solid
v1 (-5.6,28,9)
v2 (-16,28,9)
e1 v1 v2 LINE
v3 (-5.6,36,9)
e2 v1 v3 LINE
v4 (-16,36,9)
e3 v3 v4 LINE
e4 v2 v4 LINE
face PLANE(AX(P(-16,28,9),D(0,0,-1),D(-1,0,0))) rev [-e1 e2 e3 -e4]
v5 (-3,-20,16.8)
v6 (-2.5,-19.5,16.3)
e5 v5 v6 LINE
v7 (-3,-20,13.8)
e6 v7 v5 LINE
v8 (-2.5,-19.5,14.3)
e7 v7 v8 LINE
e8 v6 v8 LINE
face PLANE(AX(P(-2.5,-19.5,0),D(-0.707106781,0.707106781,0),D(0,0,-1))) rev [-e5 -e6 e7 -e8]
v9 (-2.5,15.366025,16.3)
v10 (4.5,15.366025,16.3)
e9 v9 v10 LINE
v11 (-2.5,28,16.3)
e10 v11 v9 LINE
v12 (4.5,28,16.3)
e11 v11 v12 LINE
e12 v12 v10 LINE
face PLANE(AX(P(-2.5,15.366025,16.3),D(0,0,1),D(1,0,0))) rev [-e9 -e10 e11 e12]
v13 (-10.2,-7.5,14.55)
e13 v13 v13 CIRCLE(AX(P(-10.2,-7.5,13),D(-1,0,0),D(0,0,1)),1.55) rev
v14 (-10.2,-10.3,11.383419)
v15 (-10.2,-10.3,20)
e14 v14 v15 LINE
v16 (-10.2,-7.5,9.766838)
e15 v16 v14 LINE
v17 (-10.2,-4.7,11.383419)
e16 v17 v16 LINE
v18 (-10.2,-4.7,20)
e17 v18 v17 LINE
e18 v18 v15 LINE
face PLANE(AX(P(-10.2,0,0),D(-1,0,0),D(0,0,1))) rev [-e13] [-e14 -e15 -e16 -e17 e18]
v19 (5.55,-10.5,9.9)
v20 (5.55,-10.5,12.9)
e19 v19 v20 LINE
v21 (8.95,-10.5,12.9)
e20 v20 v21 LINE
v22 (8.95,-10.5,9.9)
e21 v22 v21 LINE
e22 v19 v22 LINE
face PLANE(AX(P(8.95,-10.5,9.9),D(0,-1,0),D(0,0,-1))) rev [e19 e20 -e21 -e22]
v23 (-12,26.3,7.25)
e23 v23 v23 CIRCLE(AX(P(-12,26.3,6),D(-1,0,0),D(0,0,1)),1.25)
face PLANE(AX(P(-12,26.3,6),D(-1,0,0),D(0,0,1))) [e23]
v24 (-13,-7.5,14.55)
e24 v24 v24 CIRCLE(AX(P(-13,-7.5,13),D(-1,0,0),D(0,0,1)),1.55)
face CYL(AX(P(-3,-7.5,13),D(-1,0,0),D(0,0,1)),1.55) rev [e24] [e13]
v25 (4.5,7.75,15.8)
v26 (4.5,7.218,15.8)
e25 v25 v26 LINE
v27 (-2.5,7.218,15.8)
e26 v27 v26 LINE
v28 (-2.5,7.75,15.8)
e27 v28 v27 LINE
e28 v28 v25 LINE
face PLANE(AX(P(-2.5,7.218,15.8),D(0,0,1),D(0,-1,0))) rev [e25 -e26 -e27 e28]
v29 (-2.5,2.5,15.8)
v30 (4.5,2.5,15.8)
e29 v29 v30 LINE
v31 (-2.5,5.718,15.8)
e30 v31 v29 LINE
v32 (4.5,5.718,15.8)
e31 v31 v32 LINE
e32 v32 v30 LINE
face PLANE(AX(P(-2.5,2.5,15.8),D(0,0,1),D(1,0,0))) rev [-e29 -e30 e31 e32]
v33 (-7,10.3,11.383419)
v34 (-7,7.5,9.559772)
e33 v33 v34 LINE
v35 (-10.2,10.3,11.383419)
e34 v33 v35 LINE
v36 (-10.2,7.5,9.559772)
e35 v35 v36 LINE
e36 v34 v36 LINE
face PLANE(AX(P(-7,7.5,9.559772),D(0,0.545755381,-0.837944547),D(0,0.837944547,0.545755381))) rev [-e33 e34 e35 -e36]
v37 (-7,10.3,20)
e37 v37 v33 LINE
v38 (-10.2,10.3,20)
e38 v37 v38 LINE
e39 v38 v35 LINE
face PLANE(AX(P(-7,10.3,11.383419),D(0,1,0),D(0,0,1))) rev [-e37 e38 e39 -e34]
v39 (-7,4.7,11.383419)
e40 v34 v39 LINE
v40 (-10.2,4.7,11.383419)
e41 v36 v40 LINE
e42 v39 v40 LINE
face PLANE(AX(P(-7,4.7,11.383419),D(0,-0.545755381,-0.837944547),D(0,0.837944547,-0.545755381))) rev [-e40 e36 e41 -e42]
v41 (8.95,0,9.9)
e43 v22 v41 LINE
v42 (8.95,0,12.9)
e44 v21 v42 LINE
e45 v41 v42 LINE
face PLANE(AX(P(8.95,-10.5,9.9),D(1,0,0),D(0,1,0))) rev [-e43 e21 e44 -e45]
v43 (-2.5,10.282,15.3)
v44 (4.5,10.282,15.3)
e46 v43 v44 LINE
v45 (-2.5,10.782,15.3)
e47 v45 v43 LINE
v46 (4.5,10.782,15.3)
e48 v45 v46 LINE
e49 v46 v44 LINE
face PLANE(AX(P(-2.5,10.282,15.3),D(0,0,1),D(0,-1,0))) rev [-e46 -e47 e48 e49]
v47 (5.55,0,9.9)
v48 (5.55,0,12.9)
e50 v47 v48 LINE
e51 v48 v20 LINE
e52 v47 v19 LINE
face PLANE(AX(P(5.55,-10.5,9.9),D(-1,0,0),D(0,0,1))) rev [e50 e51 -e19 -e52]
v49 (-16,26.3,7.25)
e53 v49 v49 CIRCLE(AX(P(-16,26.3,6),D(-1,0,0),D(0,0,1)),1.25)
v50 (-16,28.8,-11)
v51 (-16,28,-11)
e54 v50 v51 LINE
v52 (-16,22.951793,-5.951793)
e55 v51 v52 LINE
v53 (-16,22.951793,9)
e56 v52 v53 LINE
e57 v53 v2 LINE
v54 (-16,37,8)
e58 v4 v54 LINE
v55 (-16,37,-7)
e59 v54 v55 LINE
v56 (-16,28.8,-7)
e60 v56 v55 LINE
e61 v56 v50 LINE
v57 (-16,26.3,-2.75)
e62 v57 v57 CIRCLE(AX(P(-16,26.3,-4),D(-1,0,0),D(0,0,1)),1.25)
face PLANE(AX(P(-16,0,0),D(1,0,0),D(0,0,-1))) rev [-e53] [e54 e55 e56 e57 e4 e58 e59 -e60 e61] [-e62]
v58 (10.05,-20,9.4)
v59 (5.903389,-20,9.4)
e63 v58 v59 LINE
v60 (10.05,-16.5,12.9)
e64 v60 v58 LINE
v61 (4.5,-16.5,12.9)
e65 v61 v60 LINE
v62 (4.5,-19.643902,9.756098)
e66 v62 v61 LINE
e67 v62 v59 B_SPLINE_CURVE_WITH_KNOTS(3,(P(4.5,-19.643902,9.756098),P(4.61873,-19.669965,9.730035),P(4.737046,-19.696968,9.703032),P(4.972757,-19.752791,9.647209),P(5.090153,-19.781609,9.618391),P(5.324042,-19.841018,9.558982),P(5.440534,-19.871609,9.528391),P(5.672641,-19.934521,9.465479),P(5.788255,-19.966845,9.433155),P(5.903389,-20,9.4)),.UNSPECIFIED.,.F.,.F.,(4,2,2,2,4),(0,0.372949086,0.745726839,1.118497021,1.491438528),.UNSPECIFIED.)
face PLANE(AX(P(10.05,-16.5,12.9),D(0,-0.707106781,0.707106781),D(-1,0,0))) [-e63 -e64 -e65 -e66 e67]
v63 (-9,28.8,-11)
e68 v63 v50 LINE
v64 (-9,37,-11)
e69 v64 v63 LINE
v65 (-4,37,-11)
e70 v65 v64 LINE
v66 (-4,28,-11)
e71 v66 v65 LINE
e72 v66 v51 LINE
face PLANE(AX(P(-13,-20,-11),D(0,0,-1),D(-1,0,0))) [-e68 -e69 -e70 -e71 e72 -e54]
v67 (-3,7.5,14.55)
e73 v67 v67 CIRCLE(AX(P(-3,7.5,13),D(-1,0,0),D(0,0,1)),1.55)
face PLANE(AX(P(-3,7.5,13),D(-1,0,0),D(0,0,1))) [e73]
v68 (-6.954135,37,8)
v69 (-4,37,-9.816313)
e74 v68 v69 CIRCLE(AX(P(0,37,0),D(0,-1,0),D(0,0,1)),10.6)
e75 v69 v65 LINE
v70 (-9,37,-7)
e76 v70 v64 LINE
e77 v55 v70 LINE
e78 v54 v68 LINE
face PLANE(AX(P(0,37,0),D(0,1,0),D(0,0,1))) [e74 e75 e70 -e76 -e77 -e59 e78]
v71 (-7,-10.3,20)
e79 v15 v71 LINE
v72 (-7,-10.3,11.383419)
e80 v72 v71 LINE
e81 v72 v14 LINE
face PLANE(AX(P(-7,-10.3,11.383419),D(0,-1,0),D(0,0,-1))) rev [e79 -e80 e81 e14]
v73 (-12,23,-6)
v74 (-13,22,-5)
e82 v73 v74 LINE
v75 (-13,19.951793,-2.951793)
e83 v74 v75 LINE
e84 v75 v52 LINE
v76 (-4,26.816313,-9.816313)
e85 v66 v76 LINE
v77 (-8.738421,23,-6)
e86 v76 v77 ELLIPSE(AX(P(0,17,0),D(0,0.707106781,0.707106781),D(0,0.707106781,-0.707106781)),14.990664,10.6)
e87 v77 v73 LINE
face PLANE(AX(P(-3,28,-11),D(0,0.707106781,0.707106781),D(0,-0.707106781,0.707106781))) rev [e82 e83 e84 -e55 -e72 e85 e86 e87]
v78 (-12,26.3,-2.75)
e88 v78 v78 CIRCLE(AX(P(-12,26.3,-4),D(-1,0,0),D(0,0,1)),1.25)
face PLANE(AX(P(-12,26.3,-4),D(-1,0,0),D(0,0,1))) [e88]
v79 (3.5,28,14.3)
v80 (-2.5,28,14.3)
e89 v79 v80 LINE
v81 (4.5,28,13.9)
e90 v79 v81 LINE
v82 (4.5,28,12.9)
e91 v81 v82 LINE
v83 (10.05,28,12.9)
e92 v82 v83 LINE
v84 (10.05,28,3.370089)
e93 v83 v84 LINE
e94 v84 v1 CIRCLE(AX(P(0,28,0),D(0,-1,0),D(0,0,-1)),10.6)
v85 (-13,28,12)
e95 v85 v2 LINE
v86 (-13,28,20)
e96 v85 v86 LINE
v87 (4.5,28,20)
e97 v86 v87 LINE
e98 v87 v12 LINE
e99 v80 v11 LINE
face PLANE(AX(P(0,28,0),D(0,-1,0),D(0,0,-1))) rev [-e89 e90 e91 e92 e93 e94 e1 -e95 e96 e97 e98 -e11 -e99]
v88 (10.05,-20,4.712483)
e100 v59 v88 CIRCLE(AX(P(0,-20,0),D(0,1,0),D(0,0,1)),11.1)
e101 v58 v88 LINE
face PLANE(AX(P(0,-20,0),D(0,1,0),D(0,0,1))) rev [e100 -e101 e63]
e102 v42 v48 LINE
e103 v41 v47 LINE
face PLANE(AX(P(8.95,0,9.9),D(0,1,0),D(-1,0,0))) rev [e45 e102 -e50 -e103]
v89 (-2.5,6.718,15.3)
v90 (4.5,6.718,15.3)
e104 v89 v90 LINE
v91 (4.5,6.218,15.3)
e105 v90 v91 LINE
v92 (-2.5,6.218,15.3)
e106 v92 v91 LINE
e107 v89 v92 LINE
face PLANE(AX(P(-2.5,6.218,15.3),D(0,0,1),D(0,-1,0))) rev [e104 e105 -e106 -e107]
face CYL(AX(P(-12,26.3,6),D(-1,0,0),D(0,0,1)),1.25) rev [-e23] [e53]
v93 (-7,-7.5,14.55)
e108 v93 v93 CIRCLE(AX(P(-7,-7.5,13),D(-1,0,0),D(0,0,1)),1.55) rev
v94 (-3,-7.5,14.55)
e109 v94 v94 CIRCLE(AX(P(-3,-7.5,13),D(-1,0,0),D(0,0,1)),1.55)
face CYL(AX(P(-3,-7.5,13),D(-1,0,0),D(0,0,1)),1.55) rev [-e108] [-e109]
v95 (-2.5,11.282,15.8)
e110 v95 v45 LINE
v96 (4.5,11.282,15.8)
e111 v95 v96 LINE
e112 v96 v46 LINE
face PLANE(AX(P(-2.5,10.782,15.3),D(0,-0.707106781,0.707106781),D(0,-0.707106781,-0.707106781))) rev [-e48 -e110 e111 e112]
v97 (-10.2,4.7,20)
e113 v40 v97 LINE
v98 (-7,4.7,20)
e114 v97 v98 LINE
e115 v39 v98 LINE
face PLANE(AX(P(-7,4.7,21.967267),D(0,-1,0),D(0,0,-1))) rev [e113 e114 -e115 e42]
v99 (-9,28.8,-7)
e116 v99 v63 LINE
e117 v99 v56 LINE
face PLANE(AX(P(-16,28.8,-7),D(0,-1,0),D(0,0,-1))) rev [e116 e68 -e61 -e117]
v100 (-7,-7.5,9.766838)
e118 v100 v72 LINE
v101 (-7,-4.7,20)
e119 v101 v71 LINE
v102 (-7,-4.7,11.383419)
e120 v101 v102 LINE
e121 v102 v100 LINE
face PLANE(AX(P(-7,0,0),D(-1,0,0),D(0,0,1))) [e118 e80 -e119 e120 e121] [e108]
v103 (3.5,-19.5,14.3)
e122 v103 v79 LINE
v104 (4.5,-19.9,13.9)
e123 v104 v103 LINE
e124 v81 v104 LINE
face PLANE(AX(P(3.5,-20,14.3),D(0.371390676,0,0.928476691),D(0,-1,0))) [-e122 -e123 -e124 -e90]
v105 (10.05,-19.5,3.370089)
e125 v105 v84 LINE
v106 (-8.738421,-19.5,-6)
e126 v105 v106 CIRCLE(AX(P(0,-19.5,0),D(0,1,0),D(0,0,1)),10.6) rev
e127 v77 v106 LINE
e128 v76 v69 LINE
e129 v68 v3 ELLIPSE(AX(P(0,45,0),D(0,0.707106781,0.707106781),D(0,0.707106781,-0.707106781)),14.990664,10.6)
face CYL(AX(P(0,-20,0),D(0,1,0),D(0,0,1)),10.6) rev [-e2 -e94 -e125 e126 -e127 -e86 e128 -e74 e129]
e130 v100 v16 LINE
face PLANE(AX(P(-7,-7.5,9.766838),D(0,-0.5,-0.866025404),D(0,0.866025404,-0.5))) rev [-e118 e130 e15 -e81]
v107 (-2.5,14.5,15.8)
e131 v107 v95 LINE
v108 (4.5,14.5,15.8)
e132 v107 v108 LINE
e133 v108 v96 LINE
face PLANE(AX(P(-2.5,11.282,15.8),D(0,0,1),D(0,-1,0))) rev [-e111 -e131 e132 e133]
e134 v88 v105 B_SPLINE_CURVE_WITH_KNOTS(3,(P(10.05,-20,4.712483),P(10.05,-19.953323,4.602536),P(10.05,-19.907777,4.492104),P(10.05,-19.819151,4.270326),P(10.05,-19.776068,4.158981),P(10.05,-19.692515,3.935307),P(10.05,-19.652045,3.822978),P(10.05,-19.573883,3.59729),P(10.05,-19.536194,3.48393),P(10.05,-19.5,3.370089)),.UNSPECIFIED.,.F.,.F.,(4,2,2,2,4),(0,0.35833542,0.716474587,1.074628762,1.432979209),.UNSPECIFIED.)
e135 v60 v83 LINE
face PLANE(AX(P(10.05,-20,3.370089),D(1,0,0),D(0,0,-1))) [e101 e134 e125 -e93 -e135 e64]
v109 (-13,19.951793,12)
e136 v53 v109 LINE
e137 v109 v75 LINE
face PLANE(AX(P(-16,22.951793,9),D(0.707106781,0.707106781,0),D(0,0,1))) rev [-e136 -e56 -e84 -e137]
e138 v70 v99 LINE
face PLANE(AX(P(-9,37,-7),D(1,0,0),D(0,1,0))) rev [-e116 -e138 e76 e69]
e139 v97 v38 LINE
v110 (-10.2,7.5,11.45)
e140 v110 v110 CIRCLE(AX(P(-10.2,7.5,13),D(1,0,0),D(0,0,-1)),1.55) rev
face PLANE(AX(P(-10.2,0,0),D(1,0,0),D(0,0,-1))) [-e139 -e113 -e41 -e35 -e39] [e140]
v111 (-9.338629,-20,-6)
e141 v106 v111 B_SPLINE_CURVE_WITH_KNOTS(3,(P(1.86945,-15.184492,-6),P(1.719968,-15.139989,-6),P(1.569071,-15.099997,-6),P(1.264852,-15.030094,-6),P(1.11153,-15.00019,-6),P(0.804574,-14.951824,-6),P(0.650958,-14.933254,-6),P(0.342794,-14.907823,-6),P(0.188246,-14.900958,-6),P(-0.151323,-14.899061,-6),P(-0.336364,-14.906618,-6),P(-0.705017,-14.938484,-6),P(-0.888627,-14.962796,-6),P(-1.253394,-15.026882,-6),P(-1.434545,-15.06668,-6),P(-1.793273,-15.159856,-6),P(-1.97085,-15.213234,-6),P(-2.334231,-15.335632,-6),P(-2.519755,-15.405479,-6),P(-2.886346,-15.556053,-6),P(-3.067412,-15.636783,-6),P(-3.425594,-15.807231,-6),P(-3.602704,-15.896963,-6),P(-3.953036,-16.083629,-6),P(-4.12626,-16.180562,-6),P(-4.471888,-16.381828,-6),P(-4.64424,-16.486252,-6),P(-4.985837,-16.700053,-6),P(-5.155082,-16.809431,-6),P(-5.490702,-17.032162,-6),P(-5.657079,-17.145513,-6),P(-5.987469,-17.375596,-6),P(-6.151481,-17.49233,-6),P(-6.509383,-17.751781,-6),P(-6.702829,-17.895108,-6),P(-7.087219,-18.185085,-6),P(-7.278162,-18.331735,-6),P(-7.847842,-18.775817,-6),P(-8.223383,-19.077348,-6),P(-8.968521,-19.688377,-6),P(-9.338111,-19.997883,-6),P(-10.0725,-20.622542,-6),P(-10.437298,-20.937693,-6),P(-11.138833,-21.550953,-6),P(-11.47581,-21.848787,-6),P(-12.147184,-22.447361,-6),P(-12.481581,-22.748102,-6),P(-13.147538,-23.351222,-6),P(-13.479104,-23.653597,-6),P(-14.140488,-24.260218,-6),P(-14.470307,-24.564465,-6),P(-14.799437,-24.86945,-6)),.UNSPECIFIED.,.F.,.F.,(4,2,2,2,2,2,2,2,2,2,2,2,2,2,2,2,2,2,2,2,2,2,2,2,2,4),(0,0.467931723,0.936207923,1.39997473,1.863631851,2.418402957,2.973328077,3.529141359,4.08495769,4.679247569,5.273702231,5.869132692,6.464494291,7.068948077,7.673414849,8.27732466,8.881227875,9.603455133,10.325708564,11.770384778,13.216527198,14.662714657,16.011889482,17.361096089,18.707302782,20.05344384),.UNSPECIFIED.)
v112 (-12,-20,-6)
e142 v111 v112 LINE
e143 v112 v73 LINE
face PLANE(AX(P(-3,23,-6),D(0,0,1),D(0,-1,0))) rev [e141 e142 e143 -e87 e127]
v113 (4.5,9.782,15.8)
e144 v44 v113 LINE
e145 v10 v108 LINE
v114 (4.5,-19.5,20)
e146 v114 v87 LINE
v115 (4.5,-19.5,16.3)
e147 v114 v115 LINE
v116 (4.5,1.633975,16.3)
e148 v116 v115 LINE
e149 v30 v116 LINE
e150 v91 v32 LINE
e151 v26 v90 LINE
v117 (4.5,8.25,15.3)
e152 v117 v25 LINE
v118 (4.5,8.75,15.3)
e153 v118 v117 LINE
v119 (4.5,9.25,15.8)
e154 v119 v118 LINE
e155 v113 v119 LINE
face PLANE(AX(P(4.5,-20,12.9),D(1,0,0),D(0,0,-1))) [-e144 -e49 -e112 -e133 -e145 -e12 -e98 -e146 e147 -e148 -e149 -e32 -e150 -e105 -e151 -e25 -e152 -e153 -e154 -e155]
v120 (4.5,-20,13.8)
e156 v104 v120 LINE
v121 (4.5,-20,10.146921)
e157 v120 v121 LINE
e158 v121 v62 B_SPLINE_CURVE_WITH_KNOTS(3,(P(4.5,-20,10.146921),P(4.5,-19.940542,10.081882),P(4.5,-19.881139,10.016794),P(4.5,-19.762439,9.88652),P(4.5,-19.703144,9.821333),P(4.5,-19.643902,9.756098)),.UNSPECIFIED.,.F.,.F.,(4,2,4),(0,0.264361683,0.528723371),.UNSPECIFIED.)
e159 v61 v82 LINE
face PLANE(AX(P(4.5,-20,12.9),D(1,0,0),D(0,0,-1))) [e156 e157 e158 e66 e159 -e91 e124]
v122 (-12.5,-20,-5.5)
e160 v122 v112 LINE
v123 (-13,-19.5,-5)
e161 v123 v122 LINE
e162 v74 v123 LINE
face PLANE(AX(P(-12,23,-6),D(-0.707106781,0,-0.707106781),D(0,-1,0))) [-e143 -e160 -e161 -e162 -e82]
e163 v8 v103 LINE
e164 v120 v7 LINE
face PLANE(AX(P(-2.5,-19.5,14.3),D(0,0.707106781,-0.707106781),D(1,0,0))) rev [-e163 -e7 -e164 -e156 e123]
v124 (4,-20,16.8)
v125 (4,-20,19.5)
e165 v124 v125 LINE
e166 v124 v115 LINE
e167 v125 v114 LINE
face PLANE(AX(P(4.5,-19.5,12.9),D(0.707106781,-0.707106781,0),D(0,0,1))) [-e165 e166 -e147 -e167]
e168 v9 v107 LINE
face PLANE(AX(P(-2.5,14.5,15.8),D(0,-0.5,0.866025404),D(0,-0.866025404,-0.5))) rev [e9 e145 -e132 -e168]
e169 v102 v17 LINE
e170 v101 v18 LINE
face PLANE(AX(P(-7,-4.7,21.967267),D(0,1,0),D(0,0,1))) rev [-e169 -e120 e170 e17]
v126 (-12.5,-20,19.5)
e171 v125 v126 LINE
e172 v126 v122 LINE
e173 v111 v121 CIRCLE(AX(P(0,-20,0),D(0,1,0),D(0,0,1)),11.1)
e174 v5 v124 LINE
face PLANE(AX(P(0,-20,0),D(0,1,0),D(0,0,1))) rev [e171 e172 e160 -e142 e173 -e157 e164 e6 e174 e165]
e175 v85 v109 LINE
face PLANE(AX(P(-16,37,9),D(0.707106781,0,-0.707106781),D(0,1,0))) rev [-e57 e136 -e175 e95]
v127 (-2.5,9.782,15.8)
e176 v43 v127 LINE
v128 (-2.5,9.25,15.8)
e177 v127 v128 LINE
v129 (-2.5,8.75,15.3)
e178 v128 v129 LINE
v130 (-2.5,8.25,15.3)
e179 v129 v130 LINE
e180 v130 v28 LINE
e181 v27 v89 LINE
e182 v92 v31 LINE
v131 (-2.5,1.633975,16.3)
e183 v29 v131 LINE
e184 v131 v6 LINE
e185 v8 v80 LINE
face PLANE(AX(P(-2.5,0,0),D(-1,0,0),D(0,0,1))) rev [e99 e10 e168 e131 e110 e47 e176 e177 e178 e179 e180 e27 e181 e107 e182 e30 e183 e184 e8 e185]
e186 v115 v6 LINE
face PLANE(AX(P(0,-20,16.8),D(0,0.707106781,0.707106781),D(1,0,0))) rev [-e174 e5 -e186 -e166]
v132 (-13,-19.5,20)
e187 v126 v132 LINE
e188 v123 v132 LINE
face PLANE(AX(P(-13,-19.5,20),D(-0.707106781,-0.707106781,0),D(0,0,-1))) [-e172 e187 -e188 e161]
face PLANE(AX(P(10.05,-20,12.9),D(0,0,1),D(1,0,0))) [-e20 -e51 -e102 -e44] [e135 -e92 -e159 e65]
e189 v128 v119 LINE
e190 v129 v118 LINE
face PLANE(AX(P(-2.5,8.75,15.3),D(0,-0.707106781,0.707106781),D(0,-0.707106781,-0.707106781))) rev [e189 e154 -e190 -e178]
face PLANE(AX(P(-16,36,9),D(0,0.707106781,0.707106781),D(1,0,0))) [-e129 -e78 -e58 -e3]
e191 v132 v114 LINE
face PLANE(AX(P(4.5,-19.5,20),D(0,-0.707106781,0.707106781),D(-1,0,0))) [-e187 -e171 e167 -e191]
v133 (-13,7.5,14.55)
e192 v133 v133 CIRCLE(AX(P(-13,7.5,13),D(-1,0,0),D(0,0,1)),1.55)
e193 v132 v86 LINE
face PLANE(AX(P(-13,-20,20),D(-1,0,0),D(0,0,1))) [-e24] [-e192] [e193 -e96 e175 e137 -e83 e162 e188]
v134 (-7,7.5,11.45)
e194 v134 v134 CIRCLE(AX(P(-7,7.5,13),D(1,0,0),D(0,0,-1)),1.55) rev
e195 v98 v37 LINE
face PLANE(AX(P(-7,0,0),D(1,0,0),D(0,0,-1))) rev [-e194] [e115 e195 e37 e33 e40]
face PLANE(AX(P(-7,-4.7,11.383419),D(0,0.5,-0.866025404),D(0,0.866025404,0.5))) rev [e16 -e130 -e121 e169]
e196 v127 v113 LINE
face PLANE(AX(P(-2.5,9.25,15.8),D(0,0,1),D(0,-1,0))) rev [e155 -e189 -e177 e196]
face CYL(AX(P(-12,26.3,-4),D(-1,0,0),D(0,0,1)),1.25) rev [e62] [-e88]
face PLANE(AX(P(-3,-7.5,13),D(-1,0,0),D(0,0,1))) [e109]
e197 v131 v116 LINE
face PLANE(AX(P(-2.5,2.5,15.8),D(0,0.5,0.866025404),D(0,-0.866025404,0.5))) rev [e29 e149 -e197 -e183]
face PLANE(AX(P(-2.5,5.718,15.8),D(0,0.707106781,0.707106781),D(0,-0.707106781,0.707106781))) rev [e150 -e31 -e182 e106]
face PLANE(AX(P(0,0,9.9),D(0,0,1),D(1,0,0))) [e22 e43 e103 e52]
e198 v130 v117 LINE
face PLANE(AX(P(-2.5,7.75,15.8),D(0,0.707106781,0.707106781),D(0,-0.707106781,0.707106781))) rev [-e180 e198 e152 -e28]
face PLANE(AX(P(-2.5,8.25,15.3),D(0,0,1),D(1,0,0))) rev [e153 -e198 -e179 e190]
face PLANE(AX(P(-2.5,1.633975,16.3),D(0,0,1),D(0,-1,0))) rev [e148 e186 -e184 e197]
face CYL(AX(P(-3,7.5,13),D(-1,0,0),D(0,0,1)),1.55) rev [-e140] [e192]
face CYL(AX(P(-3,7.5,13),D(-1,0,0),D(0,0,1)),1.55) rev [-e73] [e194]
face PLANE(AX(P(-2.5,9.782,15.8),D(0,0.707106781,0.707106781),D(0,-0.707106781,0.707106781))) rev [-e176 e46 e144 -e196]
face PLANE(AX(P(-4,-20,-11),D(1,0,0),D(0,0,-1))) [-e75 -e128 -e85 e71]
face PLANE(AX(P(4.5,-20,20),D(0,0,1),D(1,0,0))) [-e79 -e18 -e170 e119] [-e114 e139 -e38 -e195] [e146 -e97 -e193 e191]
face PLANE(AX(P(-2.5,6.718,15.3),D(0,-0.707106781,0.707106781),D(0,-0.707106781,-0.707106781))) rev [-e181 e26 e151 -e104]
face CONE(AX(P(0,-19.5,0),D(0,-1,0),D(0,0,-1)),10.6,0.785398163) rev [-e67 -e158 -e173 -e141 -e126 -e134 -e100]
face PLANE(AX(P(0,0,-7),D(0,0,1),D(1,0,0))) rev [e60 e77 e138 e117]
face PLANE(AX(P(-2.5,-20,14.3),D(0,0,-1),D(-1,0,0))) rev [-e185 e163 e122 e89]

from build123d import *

# Parameters (mm, degrees)
BOSS_EXTRUDE1_DEPTH      = 37
BOSS_EXTRUDE1_DEPTH_BACK = 20
CUT_EXTRUDE5_DEPTH       = 7
CHAMFER2_SIZE            = 3.5
CHAMFER3_SIZE            = 0.5
SKETCH6_R                = 1.55
CUT_EXTRUDE6_DEPTH       = 10
CUT_EXTRUDE7_START       = -2.8
CUT_EXTRUDE7_DEPTH       = 3.2
CUT_EXTRUDE9_DEPTH       = 10
BOSS_EXTRUDE2_DEPTH      = 3
SKETCH10_W               = 7
SKETCH10_H               = 8.2
CUT_EXTRUDE10_DEPTH      = 4
SKETCH11_R               = 1.25
CUT_EXTRUDE11_DEPTH      = 4
CHAMFER4_SIZE            = 3
CUT_EXTRUDE12_DEPTH      = 9
CHAMFER5_SIZE            = 1
SKETCH14_W               = 3.4
SKETCH14_H               = 10.5
CUT_EXTRUDE13_DEPTH      = 3
CHAMFER6_SIZE            = 1
CHAMFER7_SIZE            = 0.4
CHAMFER7_SIZE2           = 1


# Some blends are built 0.0001 mm under size
with BuildPart() as part:
    # Sketch2 → Boss-Extrude1 (new, two sides: drawn at the far end of the back side and taken through both)
    with BuildSketch(Plane(origin=(0, 0, 0), x_dir=(1, 0, 0), z_dir=(0, 1, 0)).offset(-BOSS_EXTRUDE1_DEPTH_BACK)):
        with BuildLine():
            Line((10.05, -12.9), (4.5, -12.9))
            Line((4.5, -12.9), (4.5, -20))
            Line((4.5, -20), (-13, -20))
            Line((-13, -20), (-13, 11))
            Line((-13, 11), (-4, 11))
            Line((-4, 11), (-4, 9.816312953))
            ThreePointArc((-4, 9.816312953), (-7.25402814, -7.729105754), (10.05, -3.37008902))
            Line((10.05, -3.37008902), (10.05, -12.9))
        make_face()
    extrude(amount=BOSS_EXTRUDE1_DEPTH + BOSS_EXTRUDE1_DEPTH_BACK)

    # Sketch5 → Cut-Extrude5 (cut)
    with BuildSketch(Plane(origin=(4.5, 0, 0), x_dir=(0, 0, -1), z_dir=(1, 0, 0))):
        Polygon((-15.8, 5.718), (-15.3, 6.218), (-15.3, 6.718), (-15.8, 7.218), (-15.8, 7.75), (-15.3, 8.25), (-15.3, 8.75), (-15.8, 9.25), (-15.8, 9.782), (-15.3, 10.282), (-15.3, 10.782), (-15.8, 11.282), (-15.8, 14.5), (-16.3, 15.366025404), (-16.3, 37), (-14.3, 37), (-14.3, -20), (-16.3, -20), (-16.3, 1.633974596), (-15.8, 2.5), align=None)
    extrude(amount=-CUT_EXTRUDE5_DEPTH, mode=Mode.SUBTRACT)

    # Chamfer2
    # the kernel refuses this chamfer: 3.5 mm, written as the material it takes off along each edge
    with BuildSketch(Plane(origin=(19.050890458, -20, 12.9), x_dir=(0, 0.9996219169112968, 0.02749587661058662), z_dir=(-1, 0, 0))) as chamfer2_piece_1:
        Polygon((CHAMFER2_SIZE * 0.999621916911, CHAMFER2_SIZE * 0.0274958766106), (-CHAMFER2_SIZE * 0.0274958766106, CHAMFER2_SIZE * 0.999621916911), (0, 0), align=None)
    extrude(amount=14.550890458, mode=Mode.SUBTRACT)

    # Chamfer3
    # the kernel refuses this chamfer: 0.5 mm, written as the material it takes off along each edge
    with BuildSketch(Plane(origin=(-4, -20, -12.285841494), x_dir=(-0.9996219169112968, -0.0274958766105891, 0), z_dir=(0, 0, 1))) as chamfer3_piece_1:
        Polygon((CHAMFER3_SIZE * 0.999621916911, -CHAMFER3_SIZE * 0.0274958766106), (-CHAMFER3_SIZE * 0.0274958766106, -CHAMFER3_SIZE * 0.999621916911), (0, 0), align=None)
    extrude(amount=3.755370035, mode=Mode.SUBTRACT)
    with BuildSketch(Plane(origin=(0, -20, 0), x_dir=(-0.26232896064226713, 0, -0.9649785056716795), z_dir=(0.9649785056716795, 0, -0.26232896064226713))) as chamfer3_piece_2:
        Polygon((10.6 + CHAMFER3_SIZE, 0), (10.6, CHAMFER3_SIZE), (10.6, 0), align=None)
    revolve(axis=Axis((0, -20, 0), (0, 1, 0)), revolution_arc=196.87436844, mode=Mode.SUBTRACT)
    with BuildSketch(Plane(origin=(5.785841494, -20, 14.3), x_dir=(0, -0.0274958766105891, -0.9996219169112968), z_dir=(-1, 0, 0))) as chamfer3_piece_3:
        Polygon((CHAMFER3_SIZE * 0.999621916911, -CHAMFER3_SIZE * 0.0274958766106), (-CHAMFER3_SIZE * 0.0274958766106, -CHAMFER3_SIZE * 0.999621916911), (0, 0), align=None)
    extrude(amount=8.285841494, mode=Mode.SUBTRACT)
    with BuildSketch(Plane(origin=(-2.5, -20, 14.3), x_dir=(-0.9996219169112968, -0.027495876610589075, 0), z_dir=(0, 0, 1))) as chamfer3_piece_4:
        Polygon((CHAMFER3_SIZE * 0.999621916911, -CHAMFER3_SIZE * 0.0274958766106), (-CHAMFER3_SIZE * 0.0274958766106, -CHAMFER3_SIZE * 0.999621916911), (0, 0), align=None)
    extrude(amount=2, mode=Mode.SUBTRACT)
    with BuildSketch(Plane(origin=(5.785841494, -20, 16.3), x_dir=(0, -0.027495876610589005, 0.9996219169112968), z_dir=(-1, 0, 0))) as chamfer3_piece_5:
        Polygon((CHAMFER3_SIZE * 0.999621916911, CHAMFER3_SIZE * 0.0274958766106), (-CHAMFER3_SIZE * 0.0274958766106, CHAMFER3_SIZE * 0.999621916911), (0, 0), align=None)
    extrude(amount=8.285841494, mode=Mode.SUBTRACT)
    with BuildSketch(Plane(origin=(4.5, -20, 15.014158506), x_dir=(-0.9996219169112968, -0.027495876610589075, 0), z_dir=(0, 0, 1))) as chamfer3_piece_6:
        Polygon((CHAMFER3_SIZE * 0.999621916911, -CHAMFER3_SIZE * 0.0274958766106), (-CHAMFER3_SIZE * 0.0274958766106, -CHAMFER3_SIZE * 0.999621916911), (0, 0), align=None)
    extrude(amount=6.271682988, mode=Mode.SUBTRACT)
    with BuildSketch(Plane(origin=(5.785841494, -20, 20), x_dir=(0, -0.027495876610589005, -0.9996219169112968), z_dir=(-1, 0, 0))) as chamfer3_piece_7:
        Polygon((CHAMFER3_SIZE * 0.999621916911, -CHAMFER3_SIZE * 0.0274958766106), (-CHAMFER3_SIZE * 0.0274958766106, -CHAMFER3_SIZE * 0.999621916911), (0, 0), align=None)
    extrude(amount=20.071682988, mode=Mode.SUBTRACT)
    with BuildSketch(Plane(origin=(-13, -20, 21.285841494), x_dir=(0.9996219169112968, -0.0274958766105891, 0), z_dir=(0, 0, -1))) as chamfer3_piece_8:
        Polygon((CHAMFER3_SIZE * 0.999621916911, -CHAMFER3_SIZE * 0.0274958766106), (-CHAMFER3_SIZE * 0.0274958766106, -CHAMFER3_SIZE * 0.999621916911), (0, 0), align=None)
    extrude(amount=33.571682988, mode=Mode.SUBTRACT)
    with BuildSketch(Plane(origin=(-14.285841494, -20, -11), x_dir=(0, -0.0274958766105891, 0.9996219169112968), z_dir=(1, 0, 0))) as chamfer3_piece_9:
        Polygon((CHAMFER3_SIZE * 0.999621916911, -CHAMFER3_SIZE * 0.0274958766106), (-CHAMFER3_SIZE * 0.0274958766106, -CHAMFER3_SIZE * 0.999621916911), (0, 0), align=None)
    extrude(amount=11.571682988, mode=Mode.SUBTRACT)
    with BuildSketch(Plane(origin=(0, -20, 0), x_dir=(0.3514513132600512, 0, 0.9362061602060656), z_dir=(-0.9362061602060656, 0, 0.3514513132600512))) as chamfer3_piece_10:
        Polygon((10.6 + CHAMFER3_SIZE, 0), (10.6, CHAMFER3_SIZE), (10.6, 0), align=None)
    revolve(axis=Axis((0, -20, 0), (0, 1, 0)), revolution_arc=57.836903019, mode=Mode.SUBTRACT)
    with BuildSketch(Plane(origin=(5.785841494, -20, 14.3), x_dir=(0, -0.0274958766105891, -0.9996219169112968), z_dir=(-1, 0, 0))) as chamfer3_piece_11a_section:
        Polygon((CHAMFER3_SIZE * 0.999621916911, -CHAMFER3_SIZE * 0.0274958766106), (-CHAMFER3_SIZE * 0.0274958766106, -CHAMFER3_SIZE * 0.999621916911), (0, 0), align=None)
    chamfer3_piece_11a = extrude(amount=9.571682988, mode=Mode.PRIVATE)
    chamfer3_piece_11a = split(chamfer3_piece_11a, bisect_by=Plane(origin=(-2.5, -19.835103187, 14.135103187), z_dir=(-1, 0, 0)), keep=Keep.TOP, mode=Mode.PRIVATE)
    with BuildSketch(Plane(origin=(-2.5, -20, 13.014158506), x_dir=(-0.9996219169112968, -0.027495876610589075, 0), z_dir=(0, 0, 1))) as chamfer3_piece_11b_section:
        Polygon((CHAMFER3_SIZE * 0.999621916911, -CHAMFER3_SIZE * 0.0274958766106), (-CHAMFER3_SIZE * 0.0274958766106, -CHAMFER3_SIZE * 0.999621916911), (0, 0), align=None)
    chamfer3_piece_11b = extrude(amount=3.285841494, mode=Mode.PRIVATE)
    chamfer3_piece_11b = split(chamfer3_piece_11b, bisect_by=Plane(origin=(-2.664896813, -19.835103187, 14.3), z_dir=(0, 0, -1)), keep=Keep.TOP, mode=Mode.PRIVATE)
    chamfer3_piece_11 = chamfer3_piece_11a & chamfer3_piece_11b
    add(chamfer3_piece_11, mode=Mode.SUBTRACT)
    with BuildSketch(Plane(origin=(-2.5, -20, 14.3), x_dir=(-0.9996219169112968, -0.027495876610589075, 0), z_dir=(0, 0, 1))) as chamfer3_piece_12a_section:
        Polygon((CHAMFER3_SIZE * 0.999621916911, -CHAMFER3_SIZE * 0.0274958766106), (-CHAMFER3_SIZE * 0.0274958766106, -CHAMFER3_SIZE * 0.999621916911), (0, 0), align=None)
    chamfer3_piece_12a = extrude(amount=3.285841494, mode=Mode.PRIVATE)
    chamfer3_piece_12a = split(chamfer3_piece_12a, bisect_by=Plane(origin=(-2.664896813, -19.835103187, 16.3), z_dir=(0, 0, 1)), keep=Keep.TOP, mode=Mode.PRIVATE)
    with BuildSketch(Plane(origin=(5.785841494, -20, 16.3), x_dir=(0, -0.027495876610589005, 0.9996219169112968), z_dir=(-1, 0, 0))) as chamfer3_piece_12b_section:
        Polygon((CHAMFER3_SIZE * 0.999621916911, CHAMFER3_SIZE * 0.0274958766106), (-CHAMFER3_SIZE * 0.0274958766106, CHAMFER3_SIZE * 0.999621916911), (0, 0), align=None)
    chamfer3_piece_12b = extrude(amount=9.571682988, mode=Mode.PRIVATE)
    chamfer3_piece_12b = split(chamfer3_piece_12b, bisect_by=Plane(origin=(-2.5, -19.835103187, 16.464896813), z_dir=(-1, 0, 0)), keep=Keep.TOP, mode=Mode.PRIVATE)
    chamfer3_piece_12 = chamfer3_piece_12a & chamfer3_piece_12b
    add(chamfer3_piece_12, mode=Mode.SUBTRACT)

    # Sketch6 → Cut-Extrude6 (cut)
    with BuildSketch(Plane.ZY.offset(13)):
        with Locations((13, 7.5)):
            Circle(SKETCH6_R)
        with Locations((13, -7.5)):
            Circle(SKETCH6_R)
    extrude(amount=-CUT_EXTRUDE6_DEPTH, mode=Mode.SUBTRACT)

    # Sketch7 → Cut-Extrude7 (cut)
    with BuildSketch(Plane.ZY.offset(13).offset(CUT_EXTRUDE7_START)):
        Polygon((21.967267325, -4.7), (21.967267325, -10.3), (11.383419246, -10.3), (9.766838493, -7.5), (11.383419246, -4.7), align=None)
        Polygon((11.383419246, 4.7), (9.559772236, 7.5), (11.383419246, 10.3), (21.967267325, 10.3), (21.967267325, 4.7), align=None)
    extrude(amount=-CUT_EXTRUDE7_DEPTH, mode=Mode.SUBTRACT)

    # Sketch9 → Cut-Extrude9 (cut)
    with BuildSketch(Plane.ZY.offset(13)):
        Polygon((-11, 28), (-6, 23), (-6, -20), (-11, -20), align=None)
    extrude(amount=-CUT_EXTRUDE9_DEPTH, mode=Mode.SUBTRACT)

    # Sketch12 → Boss-Extrude2 (add)
    with BuildSketch(Plane.ZY.offset(13)):
        Polygon((9, 37), (9, 22.951792944), (-5.951792944, 22.951792944), (-11, 28), (-11, 37), align=None)
    extrude(amount=BOSS_EXTRUDE2_DEPTH)

    # Sketch10 → Cut-Extrude10 (cut)
    with BuildSketch(Plane(origin=(0, 0, -11), x_dir=(-1, 0, 0), z_dir=(0, 0, -1))):
        with Locations((12.5, 32.9)):
            Rectangle(SKETCH10_W, SKETCH10_H)
    extrude(amount=-CUT_EXTRUDE10_DEPTH, mode=Mode.SUBTRACT)

    # Sketch11 → Cut-Extrude11 (cut)
    with BuildSketch(Plane.ZY.offset(16)):
        with Locations((-4, 26.3)):
            Circle(SKETCH11_R)
        with Locations((6, 26.3)):
            Circle(SKETCH11_R)
    extrude(amount=-CUT_EXTRUDE11_DEPTH, mode=Mode.SUBTRACT)

    # Chamfer4
    chamfer4_edges = [part.edges().sort_by_distance(p)[0] for p in [
        (-13, 29.975896472, 9),
        (-13, 22.951792944, 1.524103528),
    ]]
    chamfer(chamfer4_edges, length=CHAMFER4_SIZE - 0.0001)  # a hair under: the kernel refuses the full size

    # Sketch13 → Cut-Extrude12 (cut)
    with BuildSketch(Plane(origin=(0, 37, 0), x_dir=(1, 0, 0), z_dir=(0, 1, 0))):
        Polygon((-16, -9), (0, -9), (0, 6.411173943), (12, 6.411173943), (12, -20), (-16, -20), align=None)
    extrude(amount=-CUT_EXTRUDE12_DEPTH, mode=Mode.SUBTRACT)

    # Chamfer5
    chamfer5_edges = [part.edges().sort_by_distance(p)[0] for p in [
        (-10.8, 37, 9),
    ]]
    chamfer(chamfer5_edges, length=CHAMFER5_SIZE)

    # Sketch14 → Cut-Extrude13 (cut)
    with BuildSketch(Plane.XY.offset(12.9)):
        with Locations((7.25, -5.25)):
            Rectangle(SKETCH14_W, SKETCH14_H)
    extrude(amount=-CUT_EXTRUDE13_DEPTH, mode=Mode.SUBTRACT)

    # Chamfer6
    chamfer6_edges = [part.edges().sort_by_distance(p)[0] for p in [
        (-13, 1.75, -6),
    ]]
    chamfer(chamfer6_edges, length=CHAMFER6_SIZE)

    # Chamfer7
    chamfer7_edges = [part.edges().sort_by_distance(p)[0] for p in [
        (4.5, 4.25, 14.3),
    ]]
    chamfer7_side = [part.faces().sort_by_distance(p)[0] for p in [
        (4.5, 2.170208938, 13.449589105),
    ]]
    chamfer(chamfer7_edges, length=CHAMFER7_SIZE, length2=CHAMFER7_SIZE2, reference=chamfer7_side[0])


solid = part.part
